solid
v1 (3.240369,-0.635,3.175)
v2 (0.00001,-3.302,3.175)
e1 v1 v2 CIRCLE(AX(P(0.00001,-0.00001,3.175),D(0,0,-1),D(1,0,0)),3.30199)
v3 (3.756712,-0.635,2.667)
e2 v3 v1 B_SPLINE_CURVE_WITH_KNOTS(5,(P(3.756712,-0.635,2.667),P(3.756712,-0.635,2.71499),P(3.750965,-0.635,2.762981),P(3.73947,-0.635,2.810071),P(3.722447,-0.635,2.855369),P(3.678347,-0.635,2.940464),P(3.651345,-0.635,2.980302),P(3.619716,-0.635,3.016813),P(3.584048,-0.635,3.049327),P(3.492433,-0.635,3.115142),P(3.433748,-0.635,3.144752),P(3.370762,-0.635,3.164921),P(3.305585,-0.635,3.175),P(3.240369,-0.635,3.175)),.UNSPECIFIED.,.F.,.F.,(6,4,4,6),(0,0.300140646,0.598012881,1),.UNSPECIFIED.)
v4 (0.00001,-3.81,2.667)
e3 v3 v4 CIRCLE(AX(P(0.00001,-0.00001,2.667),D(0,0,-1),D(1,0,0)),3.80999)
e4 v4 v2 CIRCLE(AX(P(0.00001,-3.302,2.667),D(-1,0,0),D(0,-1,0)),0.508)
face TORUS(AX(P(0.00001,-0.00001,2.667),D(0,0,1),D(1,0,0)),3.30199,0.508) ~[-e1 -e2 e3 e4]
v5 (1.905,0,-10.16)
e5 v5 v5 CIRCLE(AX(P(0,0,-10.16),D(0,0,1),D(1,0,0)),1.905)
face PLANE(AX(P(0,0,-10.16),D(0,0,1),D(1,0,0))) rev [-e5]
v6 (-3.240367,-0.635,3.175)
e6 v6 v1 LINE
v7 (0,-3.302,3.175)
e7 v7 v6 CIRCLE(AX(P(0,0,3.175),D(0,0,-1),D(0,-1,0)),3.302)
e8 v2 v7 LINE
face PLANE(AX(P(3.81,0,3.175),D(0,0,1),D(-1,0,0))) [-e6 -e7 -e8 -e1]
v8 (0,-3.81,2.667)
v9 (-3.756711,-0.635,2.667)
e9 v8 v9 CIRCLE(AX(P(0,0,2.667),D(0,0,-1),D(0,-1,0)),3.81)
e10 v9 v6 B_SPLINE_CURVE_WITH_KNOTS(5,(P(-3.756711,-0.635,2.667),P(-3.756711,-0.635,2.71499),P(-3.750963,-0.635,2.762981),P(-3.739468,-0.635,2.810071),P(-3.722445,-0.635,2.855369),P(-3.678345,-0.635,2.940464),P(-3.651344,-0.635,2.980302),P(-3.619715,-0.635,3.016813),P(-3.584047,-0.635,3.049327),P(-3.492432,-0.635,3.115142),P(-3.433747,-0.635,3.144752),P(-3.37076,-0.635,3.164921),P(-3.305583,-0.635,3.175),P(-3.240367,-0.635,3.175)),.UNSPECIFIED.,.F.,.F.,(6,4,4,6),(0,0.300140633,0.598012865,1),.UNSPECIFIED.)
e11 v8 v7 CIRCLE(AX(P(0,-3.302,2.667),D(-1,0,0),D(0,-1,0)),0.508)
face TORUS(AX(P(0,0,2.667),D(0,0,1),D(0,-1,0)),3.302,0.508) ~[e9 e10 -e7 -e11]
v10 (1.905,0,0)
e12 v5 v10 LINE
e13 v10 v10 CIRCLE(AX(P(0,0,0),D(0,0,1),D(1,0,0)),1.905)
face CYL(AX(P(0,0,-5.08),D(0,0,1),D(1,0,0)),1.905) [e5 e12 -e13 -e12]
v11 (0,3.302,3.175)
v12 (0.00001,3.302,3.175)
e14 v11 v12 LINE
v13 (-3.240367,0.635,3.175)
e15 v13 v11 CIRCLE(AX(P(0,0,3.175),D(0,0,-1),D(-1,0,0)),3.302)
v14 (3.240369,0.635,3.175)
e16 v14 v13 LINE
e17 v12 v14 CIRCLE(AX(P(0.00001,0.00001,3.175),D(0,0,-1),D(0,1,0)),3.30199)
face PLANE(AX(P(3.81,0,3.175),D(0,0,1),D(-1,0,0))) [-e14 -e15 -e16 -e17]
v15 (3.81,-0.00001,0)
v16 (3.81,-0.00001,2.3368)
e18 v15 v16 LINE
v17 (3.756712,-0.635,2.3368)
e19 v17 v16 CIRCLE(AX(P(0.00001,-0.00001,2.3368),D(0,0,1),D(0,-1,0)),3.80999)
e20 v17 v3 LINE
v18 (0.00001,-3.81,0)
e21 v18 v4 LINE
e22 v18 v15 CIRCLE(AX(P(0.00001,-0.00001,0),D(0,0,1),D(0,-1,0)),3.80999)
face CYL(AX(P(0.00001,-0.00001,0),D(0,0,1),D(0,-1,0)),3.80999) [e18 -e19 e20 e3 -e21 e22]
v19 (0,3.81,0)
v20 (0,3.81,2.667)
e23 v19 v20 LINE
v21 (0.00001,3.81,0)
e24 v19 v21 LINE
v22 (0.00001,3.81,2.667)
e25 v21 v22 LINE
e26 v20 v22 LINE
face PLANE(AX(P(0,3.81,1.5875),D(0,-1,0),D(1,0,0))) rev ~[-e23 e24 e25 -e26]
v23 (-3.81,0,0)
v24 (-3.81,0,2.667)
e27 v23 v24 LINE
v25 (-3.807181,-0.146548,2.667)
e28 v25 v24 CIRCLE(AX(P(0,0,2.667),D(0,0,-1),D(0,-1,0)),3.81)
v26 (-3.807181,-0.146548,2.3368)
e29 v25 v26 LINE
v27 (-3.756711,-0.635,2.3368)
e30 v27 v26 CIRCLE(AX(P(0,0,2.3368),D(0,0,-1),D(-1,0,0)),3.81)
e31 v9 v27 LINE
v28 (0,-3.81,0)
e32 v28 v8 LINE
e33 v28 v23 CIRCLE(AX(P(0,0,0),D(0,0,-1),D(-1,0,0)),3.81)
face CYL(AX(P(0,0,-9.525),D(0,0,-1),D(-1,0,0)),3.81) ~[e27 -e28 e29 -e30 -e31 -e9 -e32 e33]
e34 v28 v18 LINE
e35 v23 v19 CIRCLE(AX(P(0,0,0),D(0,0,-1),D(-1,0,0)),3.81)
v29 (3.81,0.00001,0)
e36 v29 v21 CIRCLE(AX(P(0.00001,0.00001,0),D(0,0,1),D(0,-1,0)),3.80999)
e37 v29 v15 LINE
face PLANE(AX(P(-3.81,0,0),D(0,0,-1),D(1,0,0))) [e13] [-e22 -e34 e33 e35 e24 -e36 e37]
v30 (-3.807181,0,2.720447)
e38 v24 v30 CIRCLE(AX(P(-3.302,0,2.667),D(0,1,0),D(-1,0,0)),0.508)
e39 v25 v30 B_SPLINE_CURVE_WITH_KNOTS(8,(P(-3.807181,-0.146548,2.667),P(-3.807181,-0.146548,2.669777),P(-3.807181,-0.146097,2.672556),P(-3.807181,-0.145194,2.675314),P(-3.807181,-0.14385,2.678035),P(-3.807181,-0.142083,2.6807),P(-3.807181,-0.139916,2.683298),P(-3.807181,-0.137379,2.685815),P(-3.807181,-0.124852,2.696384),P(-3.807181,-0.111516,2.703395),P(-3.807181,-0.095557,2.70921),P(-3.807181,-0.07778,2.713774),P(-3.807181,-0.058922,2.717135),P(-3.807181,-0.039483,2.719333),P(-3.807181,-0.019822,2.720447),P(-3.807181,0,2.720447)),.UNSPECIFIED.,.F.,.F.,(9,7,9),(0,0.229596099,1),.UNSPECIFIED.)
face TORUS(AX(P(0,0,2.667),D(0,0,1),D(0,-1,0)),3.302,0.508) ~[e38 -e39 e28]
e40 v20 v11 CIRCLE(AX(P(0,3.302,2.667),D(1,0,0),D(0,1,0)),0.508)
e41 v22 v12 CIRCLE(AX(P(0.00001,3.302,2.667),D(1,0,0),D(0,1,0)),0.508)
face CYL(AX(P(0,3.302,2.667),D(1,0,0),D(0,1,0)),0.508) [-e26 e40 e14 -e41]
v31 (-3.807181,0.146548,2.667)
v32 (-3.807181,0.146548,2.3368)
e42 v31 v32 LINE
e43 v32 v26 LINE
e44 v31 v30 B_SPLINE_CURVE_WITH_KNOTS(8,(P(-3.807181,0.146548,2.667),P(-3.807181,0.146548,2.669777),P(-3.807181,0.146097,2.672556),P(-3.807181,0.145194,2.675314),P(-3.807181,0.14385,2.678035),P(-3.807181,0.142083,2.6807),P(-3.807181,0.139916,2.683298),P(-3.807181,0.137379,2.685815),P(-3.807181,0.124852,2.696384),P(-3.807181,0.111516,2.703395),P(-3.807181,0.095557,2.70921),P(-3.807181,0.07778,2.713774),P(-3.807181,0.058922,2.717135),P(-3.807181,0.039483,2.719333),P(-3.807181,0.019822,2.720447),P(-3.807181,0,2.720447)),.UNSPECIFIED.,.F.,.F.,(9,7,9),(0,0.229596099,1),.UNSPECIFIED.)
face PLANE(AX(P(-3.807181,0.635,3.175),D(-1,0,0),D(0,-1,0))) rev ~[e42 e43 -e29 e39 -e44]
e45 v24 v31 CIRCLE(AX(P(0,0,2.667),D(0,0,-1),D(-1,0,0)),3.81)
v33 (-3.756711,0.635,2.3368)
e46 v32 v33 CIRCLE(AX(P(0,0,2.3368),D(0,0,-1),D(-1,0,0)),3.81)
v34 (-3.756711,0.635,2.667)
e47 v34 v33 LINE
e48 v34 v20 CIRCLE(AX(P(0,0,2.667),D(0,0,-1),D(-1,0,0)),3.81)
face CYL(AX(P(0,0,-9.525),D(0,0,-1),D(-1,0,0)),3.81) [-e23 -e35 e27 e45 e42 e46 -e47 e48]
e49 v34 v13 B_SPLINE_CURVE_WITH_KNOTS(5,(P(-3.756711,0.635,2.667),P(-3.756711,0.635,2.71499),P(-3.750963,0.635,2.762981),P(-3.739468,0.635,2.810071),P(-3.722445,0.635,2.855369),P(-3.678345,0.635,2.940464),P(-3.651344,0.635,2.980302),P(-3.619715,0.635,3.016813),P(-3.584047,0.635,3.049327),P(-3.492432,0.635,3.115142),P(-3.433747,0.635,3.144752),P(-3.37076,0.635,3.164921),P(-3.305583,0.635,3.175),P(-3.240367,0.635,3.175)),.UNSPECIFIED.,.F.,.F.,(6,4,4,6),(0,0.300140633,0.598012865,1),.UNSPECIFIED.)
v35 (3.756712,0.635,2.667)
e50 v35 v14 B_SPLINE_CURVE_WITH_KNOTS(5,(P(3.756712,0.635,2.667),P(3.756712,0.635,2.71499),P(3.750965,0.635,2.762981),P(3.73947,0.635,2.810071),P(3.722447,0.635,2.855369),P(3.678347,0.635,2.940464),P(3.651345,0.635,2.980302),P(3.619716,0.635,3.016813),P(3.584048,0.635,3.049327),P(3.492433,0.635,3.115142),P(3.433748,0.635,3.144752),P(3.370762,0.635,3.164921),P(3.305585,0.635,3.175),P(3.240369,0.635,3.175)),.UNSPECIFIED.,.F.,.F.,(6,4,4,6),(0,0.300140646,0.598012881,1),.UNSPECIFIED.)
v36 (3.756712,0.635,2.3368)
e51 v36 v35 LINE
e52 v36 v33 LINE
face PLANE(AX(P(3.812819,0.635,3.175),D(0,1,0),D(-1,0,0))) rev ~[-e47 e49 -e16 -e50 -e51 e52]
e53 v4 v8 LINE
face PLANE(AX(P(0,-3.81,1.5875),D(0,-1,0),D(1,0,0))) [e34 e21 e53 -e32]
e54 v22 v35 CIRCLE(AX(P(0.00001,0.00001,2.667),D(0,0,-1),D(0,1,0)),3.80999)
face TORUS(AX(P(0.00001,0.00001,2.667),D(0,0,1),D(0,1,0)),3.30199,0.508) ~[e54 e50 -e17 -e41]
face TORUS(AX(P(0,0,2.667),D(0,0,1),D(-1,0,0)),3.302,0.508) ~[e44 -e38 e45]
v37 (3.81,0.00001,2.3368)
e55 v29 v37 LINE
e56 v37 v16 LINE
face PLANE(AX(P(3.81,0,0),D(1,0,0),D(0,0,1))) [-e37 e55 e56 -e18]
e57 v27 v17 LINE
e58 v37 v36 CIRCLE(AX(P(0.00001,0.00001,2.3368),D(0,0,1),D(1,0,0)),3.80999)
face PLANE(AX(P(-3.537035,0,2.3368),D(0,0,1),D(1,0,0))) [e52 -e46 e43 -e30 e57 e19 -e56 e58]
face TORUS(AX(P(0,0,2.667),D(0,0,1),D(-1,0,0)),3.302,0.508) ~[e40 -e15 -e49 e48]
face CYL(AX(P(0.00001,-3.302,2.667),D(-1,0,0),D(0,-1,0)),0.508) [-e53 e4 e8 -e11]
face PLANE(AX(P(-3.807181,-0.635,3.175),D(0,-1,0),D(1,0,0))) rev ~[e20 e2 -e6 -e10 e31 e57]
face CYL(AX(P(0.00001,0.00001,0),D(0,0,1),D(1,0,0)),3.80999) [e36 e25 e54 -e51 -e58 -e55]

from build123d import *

# Parameters (mm, degrees)
F1_DEPTH    = 3.81
F2_T1_DEPTH = 22.225
F3_R        = 3.80999
F0_W        = 1.905
F0_H        = 10.16
F5_R        = 0.508
F7_DEPTH    = 0.8382


# Not quite as in the source:
# - a fillet or chamfer that OpenCascade refuses, or shapes differently, is made with other operations: its cross-section is extruded or revolved along the edge and cut away or added
# - a fillet or chamfer is up to 0.001 mm smaller than in the source, because OpenCascade refuses the exact size
# - ends of sketch curves that miss each other by under 0.0002 mm in the source are joined
# - a feature names something its author has since deleted; it is built from what else it names


with BuildPart() as f1:
    # F0 (on Front) → F1 (new body, symmetric)
    with BuildSketch(Plane.XZ):
        Polygon((-3.81, 3.175), (-3.81, 0), (-1.905, 0), (0, 0), (1.905, 0), (3.81, 0), (3.81, 3.175), align=None)
    extrude(amount=F1_DEPTH, both=True)

    # F2: fillet of radius 3.81 on 2 edges, made by hand

    # F2_s2 → F2_t1 (cut)
    with BuildSketch(Plane.XY.offset(-9.525)):
        with BuildLine():
            ThreePointArc((-3.81, 0), (-2.6940768363, -2.6940768363), (0, -3.81))
            Line((0, -3.81), (-3.81, -3.81))
            Line((-3.81, -3.81), (-3.81, 0))
        make_face()
        with BuildLine():
            ThreePointArc((-3.81, 0), (-2.6940768363, 2.6940768363), (0, 3.81))
            Line((0, 3.81), (-3.81, 3.81))
            Line((-3.81, 3.81), (-3.81, 0))
        make_face()
    extrude(amount=F2_T1_DEPTH, mode=Mode.SUBTRACT)

    # F3 (radius 3.81 in the source; OpenCascade refuses exactly that, so slightly less here)
    f3_edges = [f1.edges().sort_by_distance(p)[0] for p in [
        (3.81, -3.81, 1.5875),
        (3.81, 3.81, 1.5875),
    ]]
    fillet(f3_edges, radius=F3_R)

    # F0 (on Front) → F4 (revolve)
    with BuildSketch(Plane.XZ):
        with Locations((0.9525, -5.08)):
            Rectangle(F0_W, F0_H)
    revolve(axis=Axis((0, 0, -5.08), (0, 0, 1)))

    # F5
    f5_edges = [f1.edges().sort_by_distance(p)[0] for p in [
        (-2.694077, -2.694077, 3.175),
        (2.69408, -2.69408, 3.175),
        (5e-06, -3.81, 3.175),
        (-2.694077, 2.694077, 3.175),
        (2.69408, 2.69408, 3.175),
        (5e-06, 3.81, 3.175),
    ]]
    fillet(f5_edges, radius=F5_R)

    # F6 (on face) → F7 (cut)
    with BuildSketch(Plane.XY.offset(3.175)):
        with BuildLine():
            Line((-3.2403671088, 0.635), (-3.8071805373, 0.635))
            Line((-3.8071805373, 0.635), (-3.8071805373, -0.635))
            Line((-3.8071805373, -0.635), (-3.2403671088, -0.635))
            ThreePointArc((-3.2403671088, -0.635), (-3.2865556585, -0.3189920114), (-3.302, 0))
            ThreePointArc((-3.302, 0), (-3.2865556585, 0.3189920114), (-3.2403671088, 0.635))
        make_face()
        with BuildLine():
            Line((3.2403688783, 0.635), (-3.2403671088, 0.635))
            ThreePointArc((-3.2403671088, 0.635), (-3.2865556585, 0.3189920114), (-3.302, 0))
            ThreePointArc((-3.302, 0), (-3.2865556585, -0.3189920114), (-3.2403671088, -0.635))
            Line((-3.2403671088, -0.635), (3.2403688783, -0.635))
            ThreePointArc((3.2403688783, -0.635), (3.2865561029, -0.3189969493), (3.302, -1e-05))
            ThreePointArc((3.302, -1e-05), (3.2865561029, 0.3189969493), (3.2403688783, 0.635))
        make_face()
        with BuildLine():
            Line((3.8128194627, 0.635), (3.2403688783, 0.635))
            ThreePointArc((3.2403688783, 0.635), (3.2865561029, 0.3189969493), (3.302, 1e-05))
            ThreePointArc((3.302, 1e-05), (3.2865561029, -0.3189969493), (3.2403688783, -0.635))
            Line((3.2403688783, -0.635), (3.8128194627, -0.635))
            Line((3.8128194627, -0.635), (3.8128194627, 0.635))
        make_face()
    extrude(amount=-F7_DEPTH, mode=Mode.SUBTRACT)


solid = f1.part
